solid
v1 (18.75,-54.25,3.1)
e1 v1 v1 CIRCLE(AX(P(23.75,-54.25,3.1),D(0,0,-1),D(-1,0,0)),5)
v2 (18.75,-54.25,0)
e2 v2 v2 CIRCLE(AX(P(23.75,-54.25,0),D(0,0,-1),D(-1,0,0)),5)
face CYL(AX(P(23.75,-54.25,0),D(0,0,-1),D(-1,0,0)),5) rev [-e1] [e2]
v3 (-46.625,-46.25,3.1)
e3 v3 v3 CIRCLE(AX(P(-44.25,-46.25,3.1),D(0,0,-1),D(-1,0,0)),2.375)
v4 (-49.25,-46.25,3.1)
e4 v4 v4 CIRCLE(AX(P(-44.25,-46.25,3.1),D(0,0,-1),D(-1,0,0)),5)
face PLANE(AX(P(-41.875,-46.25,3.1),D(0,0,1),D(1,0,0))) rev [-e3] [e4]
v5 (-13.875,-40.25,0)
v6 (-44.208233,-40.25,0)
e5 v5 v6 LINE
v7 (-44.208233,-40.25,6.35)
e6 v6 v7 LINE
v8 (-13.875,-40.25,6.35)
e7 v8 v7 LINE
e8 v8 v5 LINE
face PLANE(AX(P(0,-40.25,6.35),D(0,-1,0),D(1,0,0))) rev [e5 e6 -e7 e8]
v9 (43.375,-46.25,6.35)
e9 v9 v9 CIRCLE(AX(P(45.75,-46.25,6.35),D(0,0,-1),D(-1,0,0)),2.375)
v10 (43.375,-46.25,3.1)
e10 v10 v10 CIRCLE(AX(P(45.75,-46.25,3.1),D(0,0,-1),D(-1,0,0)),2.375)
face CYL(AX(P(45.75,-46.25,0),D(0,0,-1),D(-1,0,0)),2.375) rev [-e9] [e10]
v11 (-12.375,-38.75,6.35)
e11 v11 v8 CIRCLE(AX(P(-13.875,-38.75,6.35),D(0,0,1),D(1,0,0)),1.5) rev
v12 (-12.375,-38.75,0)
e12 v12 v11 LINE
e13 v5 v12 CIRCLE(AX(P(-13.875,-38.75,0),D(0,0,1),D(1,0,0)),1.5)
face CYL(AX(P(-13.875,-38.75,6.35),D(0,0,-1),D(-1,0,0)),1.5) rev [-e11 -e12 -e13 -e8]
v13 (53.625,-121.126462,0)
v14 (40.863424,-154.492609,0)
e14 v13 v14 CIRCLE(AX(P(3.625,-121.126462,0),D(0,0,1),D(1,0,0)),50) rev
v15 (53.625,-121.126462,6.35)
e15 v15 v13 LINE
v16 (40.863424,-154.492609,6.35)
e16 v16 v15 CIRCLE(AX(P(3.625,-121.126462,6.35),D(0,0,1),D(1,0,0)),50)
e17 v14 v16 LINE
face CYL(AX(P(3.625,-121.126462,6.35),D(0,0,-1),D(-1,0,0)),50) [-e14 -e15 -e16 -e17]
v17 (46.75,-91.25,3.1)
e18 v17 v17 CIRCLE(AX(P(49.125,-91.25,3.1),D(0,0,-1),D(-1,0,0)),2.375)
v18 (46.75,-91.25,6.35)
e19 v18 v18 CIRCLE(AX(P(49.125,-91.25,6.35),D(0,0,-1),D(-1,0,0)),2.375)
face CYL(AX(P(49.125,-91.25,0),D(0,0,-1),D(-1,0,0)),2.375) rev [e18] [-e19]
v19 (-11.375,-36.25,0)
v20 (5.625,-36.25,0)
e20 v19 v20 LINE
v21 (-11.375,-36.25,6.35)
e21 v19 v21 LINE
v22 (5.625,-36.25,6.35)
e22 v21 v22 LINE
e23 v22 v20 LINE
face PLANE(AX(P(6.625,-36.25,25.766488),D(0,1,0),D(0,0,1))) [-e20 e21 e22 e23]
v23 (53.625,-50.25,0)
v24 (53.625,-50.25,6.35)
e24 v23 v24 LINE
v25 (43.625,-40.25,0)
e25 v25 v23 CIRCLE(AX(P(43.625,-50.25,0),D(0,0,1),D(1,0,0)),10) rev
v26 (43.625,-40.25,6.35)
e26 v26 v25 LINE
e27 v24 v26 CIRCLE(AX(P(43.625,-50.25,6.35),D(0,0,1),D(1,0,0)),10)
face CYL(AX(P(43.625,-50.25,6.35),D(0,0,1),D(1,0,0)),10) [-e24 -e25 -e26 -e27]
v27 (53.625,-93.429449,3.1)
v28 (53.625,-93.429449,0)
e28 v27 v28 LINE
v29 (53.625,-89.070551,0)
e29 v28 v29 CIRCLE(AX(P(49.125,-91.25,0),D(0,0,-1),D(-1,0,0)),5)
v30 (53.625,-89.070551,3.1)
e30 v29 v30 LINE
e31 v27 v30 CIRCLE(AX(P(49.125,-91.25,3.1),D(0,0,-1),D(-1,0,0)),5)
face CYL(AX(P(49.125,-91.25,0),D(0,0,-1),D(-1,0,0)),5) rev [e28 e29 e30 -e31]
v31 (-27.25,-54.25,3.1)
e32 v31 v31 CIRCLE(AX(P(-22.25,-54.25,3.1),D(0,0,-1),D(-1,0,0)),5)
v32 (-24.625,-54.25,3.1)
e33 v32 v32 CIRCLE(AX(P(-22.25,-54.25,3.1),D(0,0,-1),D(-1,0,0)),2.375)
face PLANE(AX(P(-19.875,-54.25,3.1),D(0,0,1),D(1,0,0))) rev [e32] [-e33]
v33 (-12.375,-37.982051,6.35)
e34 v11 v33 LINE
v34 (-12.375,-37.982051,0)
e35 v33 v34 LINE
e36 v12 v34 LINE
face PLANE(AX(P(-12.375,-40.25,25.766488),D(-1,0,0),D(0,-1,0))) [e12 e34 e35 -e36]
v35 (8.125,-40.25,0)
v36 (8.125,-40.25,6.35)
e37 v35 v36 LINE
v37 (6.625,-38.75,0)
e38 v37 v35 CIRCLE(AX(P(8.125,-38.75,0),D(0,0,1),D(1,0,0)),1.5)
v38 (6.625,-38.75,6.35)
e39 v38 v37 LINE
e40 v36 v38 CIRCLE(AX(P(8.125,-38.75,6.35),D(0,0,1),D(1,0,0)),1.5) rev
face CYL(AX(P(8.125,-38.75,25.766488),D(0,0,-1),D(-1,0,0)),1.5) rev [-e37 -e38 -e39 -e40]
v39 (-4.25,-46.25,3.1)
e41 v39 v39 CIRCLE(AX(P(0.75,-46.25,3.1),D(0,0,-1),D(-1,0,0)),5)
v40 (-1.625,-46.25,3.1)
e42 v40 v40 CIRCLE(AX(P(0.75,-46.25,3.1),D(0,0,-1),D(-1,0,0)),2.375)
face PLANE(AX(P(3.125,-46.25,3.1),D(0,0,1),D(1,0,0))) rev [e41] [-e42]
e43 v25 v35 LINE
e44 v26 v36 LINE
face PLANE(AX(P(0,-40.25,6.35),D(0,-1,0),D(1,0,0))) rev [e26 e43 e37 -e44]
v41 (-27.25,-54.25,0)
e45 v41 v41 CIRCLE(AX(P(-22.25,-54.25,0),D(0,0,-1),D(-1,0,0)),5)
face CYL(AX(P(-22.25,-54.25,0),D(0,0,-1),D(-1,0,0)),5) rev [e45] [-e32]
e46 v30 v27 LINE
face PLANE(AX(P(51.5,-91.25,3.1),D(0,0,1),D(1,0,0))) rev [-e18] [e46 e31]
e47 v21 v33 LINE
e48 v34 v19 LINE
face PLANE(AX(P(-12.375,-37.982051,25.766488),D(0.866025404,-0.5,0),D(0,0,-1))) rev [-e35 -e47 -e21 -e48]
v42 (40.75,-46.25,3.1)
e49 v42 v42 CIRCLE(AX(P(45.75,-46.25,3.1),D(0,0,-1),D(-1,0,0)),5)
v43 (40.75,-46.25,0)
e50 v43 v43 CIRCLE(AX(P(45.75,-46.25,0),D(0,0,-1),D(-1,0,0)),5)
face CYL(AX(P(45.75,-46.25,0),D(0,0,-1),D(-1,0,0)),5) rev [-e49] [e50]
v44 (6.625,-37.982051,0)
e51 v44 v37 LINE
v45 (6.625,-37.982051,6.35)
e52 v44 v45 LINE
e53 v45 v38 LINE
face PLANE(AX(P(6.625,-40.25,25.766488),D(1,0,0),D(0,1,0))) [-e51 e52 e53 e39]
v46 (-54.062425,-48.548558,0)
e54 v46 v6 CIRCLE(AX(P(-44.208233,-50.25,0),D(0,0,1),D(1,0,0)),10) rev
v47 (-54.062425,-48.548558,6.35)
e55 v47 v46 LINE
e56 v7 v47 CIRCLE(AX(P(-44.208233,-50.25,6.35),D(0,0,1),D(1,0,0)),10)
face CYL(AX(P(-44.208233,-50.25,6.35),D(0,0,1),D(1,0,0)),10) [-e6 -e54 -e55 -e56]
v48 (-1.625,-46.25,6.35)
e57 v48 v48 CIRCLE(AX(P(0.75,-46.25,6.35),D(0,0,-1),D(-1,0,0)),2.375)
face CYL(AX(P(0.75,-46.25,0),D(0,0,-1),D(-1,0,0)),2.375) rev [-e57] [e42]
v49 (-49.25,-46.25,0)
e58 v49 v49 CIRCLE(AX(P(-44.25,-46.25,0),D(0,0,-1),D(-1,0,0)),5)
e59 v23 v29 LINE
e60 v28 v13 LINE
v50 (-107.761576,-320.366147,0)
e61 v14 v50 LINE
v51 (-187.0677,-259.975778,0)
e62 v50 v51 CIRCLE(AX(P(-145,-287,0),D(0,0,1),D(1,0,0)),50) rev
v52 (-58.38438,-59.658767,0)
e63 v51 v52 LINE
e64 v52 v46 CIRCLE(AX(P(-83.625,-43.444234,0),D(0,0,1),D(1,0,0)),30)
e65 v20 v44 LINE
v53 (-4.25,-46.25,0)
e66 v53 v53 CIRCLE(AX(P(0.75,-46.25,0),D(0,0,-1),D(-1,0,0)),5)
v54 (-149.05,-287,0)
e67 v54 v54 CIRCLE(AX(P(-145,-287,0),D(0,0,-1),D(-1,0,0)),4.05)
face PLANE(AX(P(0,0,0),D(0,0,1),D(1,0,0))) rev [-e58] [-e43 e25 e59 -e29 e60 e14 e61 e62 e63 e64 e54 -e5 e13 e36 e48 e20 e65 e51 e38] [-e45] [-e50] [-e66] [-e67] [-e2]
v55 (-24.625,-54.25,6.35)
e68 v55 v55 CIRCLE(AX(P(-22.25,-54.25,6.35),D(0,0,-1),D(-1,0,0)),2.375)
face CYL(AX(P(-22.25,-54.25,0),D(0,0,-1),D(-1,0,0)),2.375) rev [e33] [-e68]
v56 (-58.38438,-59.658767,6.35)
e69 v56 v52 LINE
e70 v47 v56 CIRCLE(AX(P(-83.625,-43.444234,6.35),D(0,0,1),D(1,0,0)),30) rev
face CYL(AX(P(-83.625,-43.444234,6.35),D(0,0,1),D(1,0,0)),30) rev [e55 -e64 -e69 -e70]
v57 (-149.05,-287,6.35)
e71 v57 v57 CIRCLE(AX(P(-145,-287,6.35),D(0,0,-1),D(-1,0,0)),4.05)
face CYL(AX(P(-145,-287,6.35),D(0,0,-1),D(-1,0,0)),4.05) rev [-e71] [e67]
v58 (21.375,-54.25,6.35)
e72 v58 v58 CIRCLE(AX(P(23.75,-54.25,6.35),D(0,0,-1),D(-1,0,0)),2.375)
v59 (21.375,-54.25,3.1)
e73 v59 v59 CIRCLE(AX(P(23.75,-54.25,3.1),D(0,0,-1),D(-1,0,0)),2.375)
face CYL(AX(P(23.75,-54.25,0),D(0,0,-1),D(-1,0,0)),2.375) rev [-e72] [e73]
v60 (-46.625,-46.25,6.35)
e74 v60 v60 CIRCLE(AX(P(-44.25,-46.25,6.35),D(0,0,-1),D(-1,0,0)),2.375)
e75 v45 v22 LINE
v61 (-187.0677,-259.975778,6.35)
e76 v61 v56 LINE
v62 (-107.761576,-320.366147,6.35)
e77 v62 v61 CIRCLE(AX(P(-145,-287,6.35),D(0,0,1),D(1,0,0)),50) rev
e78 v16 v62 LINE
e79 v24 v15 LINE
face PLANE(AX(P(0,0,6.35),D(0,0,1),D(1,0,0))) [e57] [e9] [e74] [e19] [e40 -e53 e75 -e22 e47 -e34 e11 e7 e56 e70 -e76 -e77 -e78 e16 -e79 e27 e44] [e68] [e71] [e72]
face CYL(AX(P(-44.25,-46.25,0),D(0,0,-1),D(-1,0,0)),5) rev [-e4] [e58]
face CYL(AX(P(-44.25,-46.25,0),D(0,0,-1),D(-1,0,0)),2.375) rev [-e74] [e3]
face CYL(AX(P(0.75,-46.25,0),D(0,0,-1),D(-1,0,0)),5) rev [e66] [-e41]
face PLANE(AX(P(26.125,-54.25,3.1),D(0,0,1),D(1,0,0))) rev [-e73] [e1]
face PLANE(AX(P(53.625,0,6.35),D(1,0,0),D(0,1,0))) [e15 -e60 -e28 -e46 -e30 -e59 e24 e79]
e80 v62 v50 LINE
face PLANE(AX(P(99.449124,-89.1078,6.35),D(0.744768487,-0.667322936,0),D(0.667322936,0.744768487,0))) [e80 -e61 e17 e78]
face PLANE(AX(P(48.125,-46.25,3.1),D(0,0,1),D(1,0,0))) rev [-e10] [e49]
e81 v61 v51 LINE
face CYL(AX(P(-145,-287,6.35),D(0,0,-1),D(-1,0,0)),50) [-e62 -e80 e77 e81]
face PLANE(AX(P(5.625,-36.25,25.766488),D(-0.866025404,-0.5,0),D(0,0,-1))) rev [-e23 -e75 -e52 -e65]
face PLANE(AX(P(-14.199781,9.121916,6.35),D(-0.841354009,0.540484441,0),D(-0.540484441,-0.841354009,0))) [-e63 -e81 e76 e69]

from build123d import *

# Parameters (mm, degrees)
BOSS_EXTRUDE1_DEPTH            = 6.35
FILLET1_R                      = 50
FILLET2_R                      = 30
SKETCH2_R                      = 4.05
CUT_EXTRUDE1_DEPTH             = 390.402519894
SKETCH4_W                      = 19
SKETCH4_H                      = 4
BOSS_EXTRUDE3_DEPTH            = 6.35
CHAMFER1_SIZE                  = 1
CHAMFER1_SIZE2                 = 1.732050808
FILLET3_R                      = 1.5
FILLET8_R                      = 10
CBORE_FOR_M5_SHCS2_D           = 4.75
CBORE_FOR_M5_SHCS2_CBORE_D     = 10
CBORE_FOR_M5_SHCS2_CBORE_DEPTH = 3.1


with BuildPart() as part:
    # Sketch1 → Boss-Extrude1 (new body)
    with BuildSketch(Plane.XY):
        Polygon((53.625, -52.25), (53.625, -40.25), (40.25, -40.25), (-40.25, -40.25), (-53.625, -40.25), (-53.625, -52.25), align=None)
        with BuildLine():
            Line((53.625, -140.25), (53.625, -52.25))
            Line((53.625, -52.25), (-53.625, -52.25))
            Line((-53.625, -52.25), (-187.067700458, -259.975777937))
            ThreePointArc((-187.067700458, -259.975777937), (-175.291577032, -326.779647572), (-107.761575635, -320.366146777))
            Line((-107.761575635, -320.366146777), (53.625, -140.25))
        make_face()
    extrude(amount=BOSS_EXTRUDE1_DEPTH)

    # Fillet1
    fillet1_edges = [part.edges().sort_by_distance(p)[0] for p in [
        (53.625, -140.25, 3.175),
    ]]
    fillet(fillet1_edges, radius=FILLET1_R)

    # Fillet2
    fillet2_edges = [part.edges().sort_by_distance(p)[0] for p in [
        (-53.625, -52.25, 3.175),
    ]]
    fillet(fillet2_edges, radius=FILLET2_R)

    # Sketch2 → Cut-Extrude1 (cut, through all)
    with BuildSketch(Plane(origin=(0, 0, 0), x_dir=(-1, 0, 0), z_dir=(0, 0, -1))):
        with Locations((145, -287)):
            Circle(SKETCH2_R)
    extrude(amount=-CUT_EXTRUDE1_DEPTH, mode=Mode.SUBTRACT)

    # Sketch4 → Boss-Extrude3 (add)
    with BuildSketch(Plane(origin=(0, 0, 0), x_dir=(-1, 0, 0), z_dir=(0, 0, -1))):
        with Locations((2.875, -38.25)):
            Rectangle(SKETCH4_W, SKETCH4_H)
    extrude(amount=-BOSS_EXTRUDE3_DEPTH)

    # Chamfer1
    chamfer1_edges = [part.edges().sort_by_distance(p)[0] for p in [
        (-12.375, -36.25, 3.175),
        (6.625, -36.25, 3.175),
    ]]
    chamfer1_side = [part.faces().sort_by_distance(p)[0] for p in [
        (-2.875, -36.25, 3.175),
    ]]
    chamfer(chamfer1_edges, length=CHAMFER1_SIZE, length2=CHAMFER1_SIZE2, reference=chamfer1_side[0])

    # Fillet3
    fillet3_edges = [part.edges().sort_by_distance(p)[0] for p in [
        (-12.375, -40.25, 3.175),
        (6.625, -40.25, 3.175),
    ]]
    fillet(fillet3_edges, radius=FILLET3_R)

    # Fillet8
    # the kernel refuses this fillet: 10 mm, written as the material it takes off along each edge
    with BuildSketch(Plane(origin=(53.625, -40.25, -25), x_dir=(-1, 0, 0), z_dir=(0, 0, 1))) as fillet8_piece_1:
        with BuildLine():
            CenterArc((FILLET8_R, FILLET8_R), FILLET8_R, 180, 90)
            Line((0, FILLET8_R), (0, 0))
            Line((0, 0), (FILLET8_R, 0))
        make_face()
    extrude(amount=56.35, mode=Mode.SUBTRACT)
    with BuildSketch(Plane(origin=(-53.625, -40.25, -23.541918235), x_dir=(1, 0, 0), z_dir=(0, 0, 1))) as fillet8_piece_2:
        with BuildLine():
            CenterArc((9.416767294, -10), FILLET8_R, 90, 80.203799094)
            Line((-0.43742453, -8.298558404), (-1.422843712, -8.128414244))
            ThreePointArc((-1.422843712, -8.128414244), (-1, -3.194233614), (-1, 0))
            Line((-1, 0), (0, 1))
            Line((0, 1), (9.416767294, 1))
            Line((9.416767294, 1), (9.416767294, 0))
        make_face()
    extrude(amount=53.43383647, mode=Mode.SUBTRACT)

    # CBORE for M5 SHCS2 (through all)
    with Locations(Plane(origin=(0, 0, 0), x_dir=(-1, 0, 0), z_dir=(0, 0, -1))):
        with Locations((-45.75, 26.75), (-45.75, -46.25), (-23.75, -54.25), (-0.75, -46.25), (22.25, -54.25), (44.25, -46.25), (-49.125, -91.25)):
            CounterBoreHole(CBORE_FOR_M5_SHCS2_D / 2, CBORE_FOR_M5_SHCS2_CBORE_D / 2, CBORE_FOR_M5_SHCS2_CBORE_DEPTH)


solid = part.part
